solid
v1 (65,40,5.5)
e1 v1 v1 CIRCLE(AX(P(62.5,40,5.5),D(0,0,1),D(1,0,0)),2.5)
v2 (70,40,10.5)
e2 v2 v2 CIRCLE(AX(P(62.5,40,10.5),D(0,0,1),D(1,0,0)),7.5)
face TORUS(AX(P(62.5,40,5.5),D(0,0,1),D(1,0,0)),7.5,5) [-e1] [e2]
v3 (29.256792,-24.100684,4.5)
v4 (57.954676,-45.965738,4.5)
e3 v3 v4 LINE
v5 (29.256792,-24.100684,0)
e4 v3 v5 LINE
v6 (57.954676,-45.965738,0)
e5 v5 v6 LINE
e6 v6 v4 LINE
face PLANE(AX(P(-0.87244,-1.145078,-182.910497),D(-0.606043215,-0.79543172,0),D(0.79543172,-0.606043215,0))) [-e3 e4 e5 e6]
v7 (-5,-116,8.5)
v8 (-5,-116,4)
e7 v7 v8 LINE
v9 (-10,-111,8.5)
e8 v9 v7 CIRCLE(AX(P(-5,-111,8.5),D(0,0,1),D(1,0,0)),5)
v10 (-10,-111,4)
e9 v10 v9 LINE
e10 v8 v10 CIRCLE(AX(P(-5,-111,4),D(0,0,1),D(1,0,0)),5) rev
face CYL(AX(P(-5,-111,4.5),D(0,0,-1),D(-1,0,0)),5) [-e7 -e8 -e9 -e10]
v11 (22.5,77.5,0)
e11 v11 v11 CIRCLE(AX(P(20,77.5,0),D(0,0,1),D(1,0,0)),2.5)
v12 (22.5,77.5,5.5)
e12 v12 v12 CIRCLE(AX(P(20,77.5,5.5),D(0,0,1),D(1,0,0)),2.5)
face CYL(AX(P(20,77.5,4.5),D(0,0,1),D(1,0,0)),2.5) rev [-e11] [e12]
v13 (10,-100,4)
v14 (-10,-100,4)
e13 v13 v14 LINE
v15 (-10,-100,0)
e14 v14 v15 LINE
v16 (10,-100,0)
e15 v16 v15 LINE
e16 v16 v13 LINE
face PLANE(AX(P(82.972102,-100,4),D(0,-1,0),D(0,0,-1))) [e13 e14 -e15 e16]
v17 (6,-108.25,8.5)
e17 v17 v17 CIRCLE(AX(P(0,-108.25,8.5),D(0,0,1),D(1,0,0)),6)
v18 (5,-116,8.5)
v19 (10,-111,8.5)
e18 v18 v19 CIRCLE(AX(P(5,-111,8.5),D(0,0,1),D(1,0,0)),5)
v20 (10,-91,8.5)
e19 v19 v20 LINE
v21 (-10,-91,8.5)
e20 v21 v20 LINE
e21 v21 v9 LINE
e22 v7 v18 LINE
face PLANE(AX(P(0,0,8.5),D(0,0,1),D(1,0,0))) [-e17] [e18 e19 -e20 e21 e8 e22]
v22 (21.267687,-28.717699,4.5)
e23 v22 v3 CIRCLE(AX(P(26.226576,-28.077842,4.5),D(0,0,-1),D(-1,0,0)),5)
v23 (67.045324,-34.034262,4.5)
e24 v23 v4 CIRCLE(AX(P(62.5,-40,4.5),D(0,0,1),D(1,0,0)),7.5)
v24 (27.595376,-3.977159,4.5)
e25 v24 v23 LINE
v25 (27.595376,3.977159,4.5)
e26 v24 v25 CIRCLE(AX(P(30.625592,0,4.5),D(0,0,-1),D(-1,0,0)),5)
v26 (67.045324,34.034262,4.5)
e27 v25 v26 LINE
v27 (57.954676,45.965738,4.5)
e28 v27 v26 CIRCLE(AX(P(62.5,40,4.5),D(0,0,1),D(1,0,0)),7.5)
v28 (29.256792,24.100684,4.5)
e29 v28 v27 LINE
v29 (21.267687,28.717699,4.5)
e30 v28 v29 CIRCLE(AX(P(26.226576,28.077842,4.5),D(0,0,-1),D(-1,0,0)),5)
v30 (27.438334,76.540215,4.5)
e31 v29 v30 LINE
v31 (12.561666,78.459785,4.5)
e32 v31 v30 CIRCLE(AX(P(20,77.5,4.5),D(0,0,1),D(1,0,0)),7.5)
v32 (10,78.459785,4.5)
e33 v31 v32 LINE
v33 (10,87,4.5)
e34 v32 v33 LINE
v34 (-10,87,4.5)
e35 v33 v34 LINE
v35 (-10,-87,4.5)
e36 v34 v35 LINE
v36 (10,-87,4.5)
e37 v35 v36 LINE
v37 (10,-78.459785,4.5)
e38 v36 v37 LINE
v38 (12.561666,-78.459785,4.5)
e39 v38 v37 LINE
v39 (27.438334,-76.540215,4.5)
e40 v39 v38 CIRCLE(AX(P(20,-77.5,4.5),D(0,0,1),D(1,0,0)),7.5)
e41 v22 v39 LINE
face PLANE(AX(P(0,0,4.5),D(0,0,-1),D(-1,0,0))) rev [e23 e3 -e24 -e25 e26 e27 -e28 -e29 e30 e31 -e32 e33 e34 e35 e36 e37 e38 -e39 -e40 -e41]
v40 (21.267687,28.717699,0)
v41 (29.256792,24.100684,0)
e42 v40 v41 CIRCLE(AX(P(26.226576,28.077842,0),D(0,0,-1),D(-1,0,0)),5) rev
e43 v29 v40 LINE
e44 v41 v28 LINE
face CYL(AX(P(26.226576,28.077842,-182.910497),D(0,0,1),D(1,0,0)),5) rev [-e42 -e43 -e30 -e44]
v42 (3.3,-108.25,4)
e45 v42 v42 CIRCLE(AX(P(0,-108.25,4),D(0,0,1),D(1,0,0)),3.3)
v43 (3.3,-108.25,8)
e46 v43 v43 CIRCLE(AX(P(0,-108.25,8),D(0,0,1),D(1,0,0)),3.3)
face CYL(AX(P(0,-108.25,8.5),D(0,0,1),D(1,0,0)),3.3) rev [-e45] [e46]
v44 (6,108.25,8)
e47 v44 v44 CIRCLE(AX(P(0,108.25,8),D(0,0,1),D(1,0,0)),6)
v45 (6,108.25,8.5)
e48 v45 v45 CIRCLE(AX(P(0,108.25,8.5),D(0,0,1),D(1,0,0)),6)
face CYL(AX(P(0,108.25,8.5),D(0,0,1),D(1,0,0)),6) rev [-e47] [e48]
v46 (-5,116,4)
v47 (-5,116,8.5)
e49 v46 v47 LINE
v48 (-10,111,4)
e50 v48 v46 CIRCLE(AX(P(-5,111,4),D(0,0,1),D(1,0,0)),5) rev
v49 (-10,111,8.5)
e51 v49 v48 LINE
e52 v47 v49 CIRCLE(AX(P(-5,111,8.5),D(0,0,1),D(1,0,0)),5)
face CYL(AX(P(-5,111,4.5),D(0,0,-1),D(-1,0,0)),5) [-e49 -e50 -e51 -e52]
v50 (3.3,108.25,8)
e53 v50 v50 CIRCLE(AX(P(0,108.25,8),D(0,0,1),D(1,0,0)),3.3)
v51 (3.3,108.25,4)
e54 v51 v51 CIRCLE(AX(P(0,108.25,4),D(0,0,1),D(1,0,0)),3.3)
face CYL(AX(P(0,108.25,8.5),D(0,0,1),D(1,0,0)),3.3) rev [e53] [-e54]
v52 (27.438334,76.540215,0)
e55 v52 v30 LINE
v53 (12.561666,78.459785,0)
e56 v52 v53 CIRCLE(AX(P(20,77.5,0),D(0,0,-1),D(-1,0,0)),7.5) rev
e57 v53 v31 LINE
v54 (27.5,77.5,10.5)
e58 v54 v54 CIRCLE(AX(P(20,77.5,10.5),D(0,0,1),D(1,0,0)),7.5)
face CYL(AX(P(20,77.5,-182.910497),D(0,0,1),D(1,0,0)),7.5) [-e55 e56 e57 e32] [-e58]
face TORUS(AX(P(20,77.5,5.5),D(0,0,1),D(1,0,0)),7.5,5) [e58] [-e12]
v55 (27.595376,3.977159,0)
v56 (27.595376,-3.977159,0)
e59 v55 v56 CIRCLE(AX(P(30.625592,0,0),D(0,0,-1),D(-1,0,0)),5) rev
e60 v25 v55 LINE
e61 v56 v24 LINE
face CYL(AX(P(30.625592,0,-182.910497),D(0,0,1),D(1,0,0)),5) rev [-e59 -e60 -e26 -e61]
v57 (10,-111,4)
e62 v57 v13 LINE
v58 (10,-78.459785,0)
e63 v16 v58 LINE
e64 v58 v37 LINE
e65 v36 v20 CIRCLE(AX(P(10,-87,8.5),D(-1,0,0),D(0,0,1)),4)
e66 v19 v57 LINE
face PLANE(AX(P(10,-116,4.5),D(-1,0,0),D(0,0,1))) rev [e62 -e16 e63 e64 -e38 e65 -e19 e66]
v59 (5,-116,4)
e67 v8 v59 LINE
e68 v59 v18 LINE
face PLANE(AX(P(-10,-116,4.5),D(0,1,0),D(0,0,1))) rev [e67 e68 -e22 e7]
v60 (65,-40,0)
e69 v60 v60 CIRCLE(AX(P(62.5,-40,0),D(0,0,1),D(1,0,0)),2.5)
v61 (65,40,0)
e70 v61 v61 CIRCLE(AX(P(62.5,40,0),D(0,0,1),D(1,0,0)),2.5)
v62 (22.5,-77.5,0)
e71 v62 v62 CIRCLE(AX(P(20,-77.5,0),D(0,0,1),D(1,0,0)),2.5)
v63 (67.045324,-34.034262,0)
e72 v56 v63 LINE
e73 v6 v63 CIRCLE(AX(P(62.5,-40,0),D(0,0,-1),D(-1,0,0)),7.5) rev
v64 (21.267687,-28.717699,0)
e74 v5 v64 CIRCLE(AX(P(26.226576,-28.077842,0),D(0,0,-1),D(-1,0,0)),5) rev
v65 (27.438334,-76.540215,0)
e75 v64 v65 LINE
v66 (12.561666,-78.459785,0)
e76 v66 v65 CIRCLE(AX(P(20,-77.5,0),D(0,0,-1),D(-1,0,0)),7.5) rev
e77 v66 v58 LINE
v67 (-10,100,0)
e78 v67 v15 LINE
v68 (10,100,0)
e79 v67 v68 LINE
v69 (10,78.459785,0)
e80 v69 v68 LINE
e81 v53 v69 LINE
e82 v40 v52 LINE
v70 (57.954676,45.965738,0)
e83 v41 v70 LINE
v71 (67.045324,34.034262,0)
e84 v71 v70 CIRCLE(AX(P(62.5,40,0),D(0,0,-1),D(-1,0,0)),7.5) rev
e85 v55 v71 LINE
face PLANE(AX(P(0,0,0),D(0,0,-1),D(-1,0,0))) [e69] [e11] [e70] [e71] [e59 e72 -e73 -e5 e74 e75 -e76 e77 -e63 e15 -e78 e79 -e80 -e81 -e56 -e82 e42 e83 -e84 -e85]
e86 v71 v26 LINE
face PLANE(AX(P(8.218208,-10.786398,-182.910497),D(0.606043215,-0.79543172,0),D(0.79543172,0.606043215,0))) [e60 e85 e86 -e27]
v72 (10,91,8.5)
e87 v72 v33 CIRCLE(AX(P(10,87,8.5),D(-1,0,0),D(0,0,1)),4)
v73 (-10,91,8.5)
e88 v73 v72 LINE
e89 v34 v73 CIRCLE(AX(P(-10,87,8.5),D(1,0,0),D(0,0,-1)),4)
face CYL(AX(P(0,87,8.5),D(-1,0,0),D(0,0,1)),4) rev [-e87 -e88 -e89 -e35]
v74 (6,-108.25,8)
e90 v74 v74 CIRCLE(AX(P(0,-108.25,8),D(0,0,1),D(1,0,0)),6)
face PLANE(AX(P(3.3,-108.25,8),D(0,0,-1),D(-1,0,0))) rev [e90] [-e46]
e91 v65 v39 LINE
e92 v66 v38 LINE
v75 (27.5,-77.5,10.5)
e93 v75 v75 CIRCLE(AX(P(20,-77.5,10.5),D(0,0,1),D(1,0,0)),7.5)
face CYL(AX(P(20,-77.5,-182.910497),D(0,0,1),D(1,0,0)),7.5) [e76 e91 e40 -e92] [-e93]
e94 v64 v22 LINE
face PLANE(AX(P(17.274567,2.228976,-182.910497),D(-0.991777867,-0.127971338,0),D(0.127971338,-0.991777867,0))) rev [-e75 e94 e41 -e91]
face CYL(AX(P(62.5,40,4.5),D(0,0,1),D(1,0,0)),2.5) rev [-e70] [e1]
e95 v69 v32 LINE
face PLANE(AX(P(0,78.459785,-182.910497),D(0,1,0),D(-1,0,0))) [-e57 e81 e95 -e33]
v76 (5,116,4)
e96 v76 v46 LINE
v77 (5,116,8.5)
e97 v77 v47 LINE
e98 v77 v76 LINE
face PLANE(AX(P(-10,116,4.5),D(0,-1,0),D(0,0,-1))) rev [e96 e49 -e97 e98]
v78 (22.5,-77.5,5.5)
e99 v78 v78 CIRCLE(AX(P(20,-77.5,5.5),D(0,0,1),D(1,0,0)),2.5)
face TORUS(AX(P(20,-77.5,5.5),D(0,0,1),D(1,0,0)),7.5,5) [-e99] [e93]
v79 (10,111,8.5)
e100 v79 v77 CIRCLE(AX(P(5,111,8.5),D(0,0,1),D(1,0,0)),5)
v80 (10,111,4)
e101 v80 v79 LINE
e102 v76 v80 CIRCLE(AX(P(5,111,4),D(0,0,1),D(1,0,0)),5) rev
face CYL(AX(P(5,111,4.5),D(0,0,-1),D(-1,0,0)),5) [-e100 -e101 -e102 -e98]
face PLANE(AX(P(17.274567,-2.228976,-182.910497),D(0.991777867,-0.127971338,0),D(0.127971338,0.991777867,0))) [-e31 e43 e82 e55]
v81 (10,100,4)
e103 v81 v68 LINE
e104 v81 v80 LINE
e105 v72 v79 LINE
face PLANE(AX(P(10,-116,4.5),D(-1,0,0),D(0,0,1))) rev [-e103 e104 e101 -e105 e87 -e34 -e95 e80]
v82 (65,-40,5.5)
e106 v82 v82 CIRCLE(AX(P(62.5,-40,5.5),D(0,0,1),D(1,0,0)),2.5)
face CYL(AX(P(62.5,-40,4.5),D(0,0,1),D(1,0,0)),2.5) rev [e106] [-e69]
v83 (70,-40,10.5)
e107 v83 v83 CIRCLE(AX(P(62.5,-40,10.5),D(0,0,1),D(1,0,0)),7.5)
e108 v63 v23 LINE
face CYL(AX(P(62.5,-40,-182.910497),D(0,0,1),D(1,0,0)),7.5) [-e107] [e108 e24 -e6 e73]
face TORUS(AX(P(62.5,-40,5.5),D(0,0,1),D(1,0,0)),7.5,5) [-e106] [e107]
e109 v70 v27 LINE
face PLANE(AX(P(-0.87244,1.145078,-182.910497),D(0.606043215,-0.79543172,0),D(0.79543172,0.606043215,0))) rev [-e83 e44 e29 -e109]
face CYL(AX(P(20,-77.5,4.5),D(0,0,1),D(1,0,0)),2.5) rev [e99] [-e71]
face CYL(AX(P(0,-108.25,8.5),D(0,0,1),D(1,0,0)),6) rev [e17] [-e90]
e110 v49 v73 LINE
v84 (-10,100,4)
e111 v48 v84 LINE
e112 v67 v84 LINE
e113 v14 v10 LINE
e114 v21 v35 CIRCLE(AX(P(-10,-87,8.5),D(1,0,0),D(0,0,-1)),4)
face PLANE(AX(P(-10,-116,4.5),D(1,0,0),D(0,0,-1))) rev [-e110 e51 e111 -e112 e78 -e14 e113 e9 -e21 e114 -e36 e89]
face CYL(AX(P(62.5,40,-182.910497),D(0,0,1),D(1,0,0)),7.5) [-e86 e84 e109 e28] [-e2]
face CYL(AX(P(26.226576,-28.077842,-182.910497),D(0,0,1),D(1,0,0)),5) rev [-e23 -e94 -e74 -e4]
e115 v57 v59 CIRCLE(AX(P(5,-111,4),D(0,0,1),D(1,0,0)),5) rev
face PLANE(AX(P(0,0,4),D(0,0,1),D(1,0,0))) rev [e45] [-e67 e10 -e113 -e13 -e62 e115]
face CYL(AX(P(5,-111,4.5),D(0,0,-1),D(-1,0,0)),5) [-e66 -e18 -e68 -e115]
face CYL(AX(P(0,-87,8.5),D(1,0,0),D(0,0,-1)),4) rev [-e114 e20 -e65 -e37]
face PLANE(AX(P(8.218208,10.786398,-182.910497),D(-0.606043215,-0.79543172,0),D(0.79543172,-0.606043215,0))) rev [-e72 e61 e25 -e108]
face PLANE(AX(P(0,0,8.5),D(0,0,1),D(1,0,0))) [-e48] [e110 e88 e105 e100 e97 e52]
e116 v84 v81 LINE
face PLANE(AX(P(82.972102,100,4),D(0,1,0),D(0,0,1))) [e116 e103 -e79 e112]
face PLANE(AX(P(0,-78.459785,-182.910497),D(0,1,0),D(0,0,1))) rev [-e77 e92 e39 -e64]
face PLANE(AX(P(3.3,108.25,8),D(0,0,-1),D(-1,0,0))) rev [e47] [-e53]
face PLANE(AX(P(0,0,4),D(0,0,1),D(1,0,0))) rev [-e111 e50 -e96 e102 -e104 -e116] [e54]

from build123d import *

# Parameters (mm, degrees)
SKETCH_1_W                   = 20
SKETCH_1_H                   = 232
EXTRUDE_1_DEPTH              = 4.5
EXTRUDE_3_DEPTH              = 4.5
FILLET_2_R                   = 4.999999999999999
HOLE_WIZARD_M6_1_D           = 5
FILLET_4_R                   = 4.999999999999999
EXTRUDE_START                = 4
EXTRUDE_4_DEPTH              = 4
SKETCH_9_W                   = 319.0213755361433
SKETCH_9_H                   = 251.11270465686212
CUT_EXTRUDE_1_DEPTH          = 4
FILLET_5_R                   = 4
HOLE_WIZARD_M6_2_D           = 6.6
HOLE_WIZARD_M6_2_CBORE_D     = 12
HOLE_WIZARD_M6_2_CBORE_DEPTH = 0.5
EXTRUDE_START_2              = 6
SKETCH_13_R                  = 2.4999999999999987
SKETCH_13_R_2                = 2.499999999999995
EXTRUDE_5_DEPTH              = 6
FILLET_6_R                   = 5


# Some blends are built 0.0001 mm under size
with BuildPart() as part:
    # 草图1 → 凸台-拉伸1 (new body)
    with BuildSketch(Plane.XY):
        Rectangle(SKETCH_1_W, SKETCH_1_H)
    extrude(amount=EXTRUDE_1_DEPTH)

    # 草图4 → 凸台-拉伸3 (add)
    with BuildSketch(Plane.XY.offset(4.5)):
        with BuildLine():
            Line((67.04532411447143, -34.03426209975627), (22.3753551085413, -8.9e-16))
            Line((22.375355108541303, -2.66e-15), (67.04532411447141, 34.0342620997563))
            ThreePointArc((67.04532411447141, 34.03426209975629), (68.46573790024371, 44.54532411447144), (57.954675885528566, 45.96573790024377))
            Line((57.954675885528566, 45.96573790024377), (19.735945661830147, 16.846705348854464))
            Line((19.73594566183015, 16.846705348854464), (27.438333999755184, 76.54021496777352))
            ThreePointArc((27.438333999755184, 76.54021496777352), (20.959785032226467, 84.9383339997552), (12.561666000244795, 78.45978503222648))
            Line((12.561666000244797, 78.45978503222648), (10.000000000000002, 78.45978503222645))
            Line((10.000000000000002, 78.45978503222645), (9.999999999999897, 58.60687353032759))
            Line((9.999999999999785, 58.606873530327604), (2.561666000244813, 0.9597850322264776))
            ThreePointArc((2.5616660002448137, 0.9597850322264744), (2.5000000000000036, -1.321e-14), (2.561666000244818, -0.9597850322265004))
            Line((2.561666000244811, -0.959785032226501), (9.999999999999945, -58.606873530328755))
            Line((9.999999999999973, -58.606873530328755), (10.000000000000002, -78.45978503222648))
            Line((10.000000000000002, -78.45978503222648), (12.561666000244813, -78.45978503222648))
            ThreePointArc((12.561666000244813, -78.45978503222648), (20.95978503222648, -84.9383339997552), (27.43833399975519, -76.54021496777352))
            Line((27.438333999755194, -76.54021496777352), (19.735945661830147, -16.846705348854485))
            Line((19.735945661830144, -16.84670534885448), (57.95467588552857, -45.96573790024377))
            ThreePointArc((57.95467588552857, -45.96573790024377), (68.46573790024374, -44.54532411447145), (67.04532411447143, -34.034262099756276))
        make_face()
    extrude(amount=-EXTRUDE_3_DEPTH)

    # 圆角2
    fillet_2_edges = [part.edges().sort_by_distance(p)[0] for p in [
        (19.735945661830144, -16.846705348854485, 2.25),
        (22.3753551085413, -1.78e-15, 2.25),
        (19.73594566183015, 16.846705348854464, 2.25),
    ]]
    fillet(fillet_2_edges, radius=FILLET_2_R)

    # Hole Wizard M6 _1 (through all)
    with Locations(Plane.XY.offset(4.5)):
        with Locations((20, 77.5), (62.5, 40), (20, -77.5), (62.5, -40)):
            Hole(HOLE_WIZARD_M6_1_D / 2)

    # 圆角4
    fillet_4_edges = [part.edges().sort_by_distance(p)[0] for p in [
        (10.000000000000002, -116.00000000000001, 2.25),
        (-9.999999999999998, -116.00000000000001, 2.25),
        (-9.999999999999998, 115.99999999999999, 2.25),
        (10.000000000000002, 115.99999999999999, 2.25),
    ]]
    fillet(fillet_4_edges, radius=FILLET_4_R)

    # 草图8 → 凸台-拉伸4 (add)
    with BuildSketch(Plane.XY.offset(4.5).offset(EXTRUDE_START)):
        with BuildLine():
            Line((10, -91), (-10, -91))
            Line((-9.999999999999998, -91.00000000000001), (-9.999999999999998, -111.00000000000001))
            ThreePointArc((-10, -111.00000000000001), (-8.535533905932738, -114.53553390593275), (-5, -116.00000000000001))
            Line((-5, -116.00000000000001), (5.0000000000000036, -116.00000000000001))
            ThreePointArc((5.000000000000003, -116.00000000000001), (8.535533905932741, -114.53553390593275), (10.000000000000004, -111.00000000000001))
            Line((10.000000000000005, -111.00000000000001), (10.000000000000004, -91))
        make_face()
        with BuildLine():
            Line((-9.999999999999998, 110.99999999999993), (-9.999999999999998, 91))
            Line((-10, 91), (10, 91))
            Line((10.000000000000002, 91), (10.000000000000002, 110.99999999999993))
            ThreePointArc((10, 110.99999999999993), (8.535533905932763, 114.53553390593271), (5.000000000000003, 115.99999999999999))
            Line((5.000000000000003, 115.99999999999999), (-4.999999999999999, 115.99999999999999))
            ThreePointArc((-4.999999999999999, 115.99999999999999), (-8.535533905932759, 114.53553390593271), (-9.999999999999996, 110.99999999999993))
        make_face()
    extrude(amount=-EXTRUDE_4_DEPTH)

    # 草图9 → 切除-拉伸1 (cut)
    with BuildSketch(Plane(origin=(0, 0, 0), x_dir=(-1, 0, 0), z_dir=(0, 0, -1))):
        Rectangle(SKETCH_9_W, SKETCH_9_H)
        Polygon((-82.97210234114478, 100), (82.97210234114469, 100), (82.97210234114472, -100), (-82.97210234114475, -100), align=None, mode=Mode.SUBTRACT)
    extrude(amount=-CUT_EXTRUDE_1_DEPTH, mode=Mode.SUBTRACT)

    # 圆角5
    fillet_5_edges = [part.edges().sort_by_distance(p)[0] for p in [
        (0, -91, 4.5),
        (0, 91, 4.5),
    ]]
    fillet(fillet_5_edges, radius=FILLET_5_R - 0.0001)  # a hair under: the kernel refuses the full size

    # M6 六角头螺栓的柱形沉头孔2 (through all)
    with Locations(Plane.XY.offset(8.5)):
        with Locations((0, 108.25), (0, -108.25)):
            CounterBoreHole(HOLE_WIZARD_M6_2_D / 2, HOLE_WIZARD_M6_2_CBORE_D / 2, HOLE_WIZARD_M6_2_CBORE_DEPTH)

    # 草图13 → 凸台-拉伸5 (add)
    # profile 1 of 4: a face of its own
    with BuildSketch(Plane.XY.offset(4.5).offset(EXTRUDE_START_2)):
        with BuildLine():
            ThreePointArc((27.438333999755173, 76.54021496777352), (27.484567622720885, 77.01911799688693), (27.499999999999986, 77.5))
            ThreePointArc((27.499999999999986, 77.5), (20.480882003113063, 84.9845676227209), (12.561666000244797, 78.45978503222648))
            ThreePointArc((12.561666000244797, 78.45978503222648), (19.040214967773508, 70.06166600024481), (27.438333999755173, 76.54021496777352))
        make_face()
        with Locations((19.999999999999986, 77.5)):
            Circle(SKETCH_13_R, mode=Mode.SUBTRACT)
    # profile 2 of 4: a face of its own
    with BuildSketch(Plane.XY.offset(4.5).offset(EXTRUDE_START_2)):
        with BuildLine():
            ThreePointArc((70, 40.00000000000002), (65.82866858829955, 46.72086046792137), (57.954675885528566, 45.96573790024377))
            ThreePointArc((57.954675885528566, 45.96573790024377), (56.53426209975625, 35.454675885528594), (67.04532411447143, 34.034262099756276))
            ThreePointArc((67.04532411447143, 34.034262099756276), (69.22086046792134, 36.671331411700464), (70, 40.00000000000002))
        make_face()
        with Locations((62.49999999999999, 40.00000000000002)):
            Circle(SKETCH_13_R_2, mode=Mode.SUBTRACT)
    # profile 3 of 4: a face of its own
    with BuildSketch(Plane.XY.offset(4.5).offset(EXTRUDE_START_2)):
        with BuildLine():
            ThreePointArc((69.99999999999999, -40.00000000000002), (69.22086046792133, -36.67133141170047), (67.04532411447141, -34.03426209975629))
            ThreePointArc((67.04532411447141, -34.03426209975629), (56.53426209975626, -35.4546758855286), (57.95467588552858, -45.96573790024376))
            ThreePointArc((57.95467588552858, -45.96573790024376), (65.82866858829955, -46.720860467921355), (69.99999999999999, -40.00000000000002))
        make_face()
        with Locations((62.49999999999999, -40.00000000000002)):
            Circle(SKETCH_13_R_2, mode=Mode.SUBTRACT)
    # profile 4 of 4: a face of its own
    with BuildSketch(Plane.XY.offset(4.5).offset(EXTRUDE_START_2)):
        with BuildLine():
            ThreePointArc((27.438333999755177, -76.54021496777352), (19.040214967773533, -70.06166600024483), (12.561666000244838, -78.45978503222648))
            ThreePointArc((12.561666000244838, -78.45978503222648), (20.48088200311308, -84.98456762272087), (27.499999999999986, -77.5))
            ThreePointArc((27.499999999999986, -77.5), (27.484567622720885, -77.01911799688692), (27.438333999755177, -76.54021496777352))
        make_face()
        with Locations((20.000000000000007, -77.5)):
            Circle(SKETCH_13_R, mode=Mode.SUBTRACT)
    extrude(amount=-EXTRUDE_5_DEPTH)

    # 圆角6
    # the kernel refuses this fillet: 5 mm, written as the material it takes off along each edge
    with BuildSketch(Plane(origin=(19.999999999999986, 77.5, 10.5), x_dir=(1, 0, 0), z_dir=(0, -1, 0))) as fillet_6_piece_1:
        with BuildLine():
            CenterArc((2.5 + FILLET_6_R, -FILLET_6_R), FILLET_6_R, 90.00000000000017, 89.99999999999983)
            Line((2.5 + FILLET_6_R, 0), (2.5, 0))
            Line((2.5, 0), (2.500000000000014, -FILLET_6_R))
        make_face()
    revolve(axis=Axis((19.999999999999986, 77.5, 10.5), (0, 0, 1)), mode=Mode.SUBTRACT)
    with BuildSketch(Plane(origin=(62.49999999999999, 40.00000000000002, 10.5), x_dir=(1, 0, 0), z_dir=(0, -1, 0))) as fillet_6_piece_2:
        with BuildLine():
            CenterArc((2.499999999999993 + FILLET_6_R, -FILLET_6_R), FILLET_6_R, 90.00000000000017, 89.99999999999983)
            Line((2.499999999999993 + FILLET_6_R, 0), (2.499999999999993, 0))
            Line((2.499999999999993, 0), (2.500000000000007, -FILLET_6_R))
        make_face()
    revolve(axis=Axis((62.49999999999999, 40.00000000000002, 10.5), (0, 0, 1)), mode=Mode.SUBTRACT)
    with BuildSketch(Plane(origin=(62.49999999999999, -40.00000000000002, 10.5), x_dir=(1, 0, 0), z_dir=(0, -1, 0))) as fillet_6_piece_3:
        with BuildLine():
            CenterArc((2.499999999999993 + FILLET_6_R, -FILLET_6_R), FILLET_6_R, 90.00000000000017, 89.99999999999983)
            Line((2.499999999999993 + FILLET_6_R, 0), (2.499999999999993, 0))
            Line((2.499999999999993, 0), (2.500000000000007, -FILLET_6_R))
        make_face()
    revolve(axis=Axis((62.49999999999999, -40.00000000000002, 10.5), (0, 0, 1)), mode=Mode.SUBTRACT)
    with BuildSketch(Plane(origin=(20.000000000000007, -77.5, 10.5), x_dir=(1, 0, 0), z_dir=(0, -1, 0))) as fillet_6_piece_4:
        with BuildLine():
            CenterArc((2.5 + FILLET_6_R, -FILLET_6_R), FILLET_6_R, 89.99999999999993, 90.00000000000006)
            Line((2.5 + FILLET_6_R, 0), (2.5, 0))
            Line((2.5, 0), (2.499999999999993, -FILLET_6_R))
        make_face()
    revolve(axis=Axis((20.000000000000007, -77.5, 10.5), (0, 0, 1)), mode=Mode.SUBTRACT)


solid = part.part
